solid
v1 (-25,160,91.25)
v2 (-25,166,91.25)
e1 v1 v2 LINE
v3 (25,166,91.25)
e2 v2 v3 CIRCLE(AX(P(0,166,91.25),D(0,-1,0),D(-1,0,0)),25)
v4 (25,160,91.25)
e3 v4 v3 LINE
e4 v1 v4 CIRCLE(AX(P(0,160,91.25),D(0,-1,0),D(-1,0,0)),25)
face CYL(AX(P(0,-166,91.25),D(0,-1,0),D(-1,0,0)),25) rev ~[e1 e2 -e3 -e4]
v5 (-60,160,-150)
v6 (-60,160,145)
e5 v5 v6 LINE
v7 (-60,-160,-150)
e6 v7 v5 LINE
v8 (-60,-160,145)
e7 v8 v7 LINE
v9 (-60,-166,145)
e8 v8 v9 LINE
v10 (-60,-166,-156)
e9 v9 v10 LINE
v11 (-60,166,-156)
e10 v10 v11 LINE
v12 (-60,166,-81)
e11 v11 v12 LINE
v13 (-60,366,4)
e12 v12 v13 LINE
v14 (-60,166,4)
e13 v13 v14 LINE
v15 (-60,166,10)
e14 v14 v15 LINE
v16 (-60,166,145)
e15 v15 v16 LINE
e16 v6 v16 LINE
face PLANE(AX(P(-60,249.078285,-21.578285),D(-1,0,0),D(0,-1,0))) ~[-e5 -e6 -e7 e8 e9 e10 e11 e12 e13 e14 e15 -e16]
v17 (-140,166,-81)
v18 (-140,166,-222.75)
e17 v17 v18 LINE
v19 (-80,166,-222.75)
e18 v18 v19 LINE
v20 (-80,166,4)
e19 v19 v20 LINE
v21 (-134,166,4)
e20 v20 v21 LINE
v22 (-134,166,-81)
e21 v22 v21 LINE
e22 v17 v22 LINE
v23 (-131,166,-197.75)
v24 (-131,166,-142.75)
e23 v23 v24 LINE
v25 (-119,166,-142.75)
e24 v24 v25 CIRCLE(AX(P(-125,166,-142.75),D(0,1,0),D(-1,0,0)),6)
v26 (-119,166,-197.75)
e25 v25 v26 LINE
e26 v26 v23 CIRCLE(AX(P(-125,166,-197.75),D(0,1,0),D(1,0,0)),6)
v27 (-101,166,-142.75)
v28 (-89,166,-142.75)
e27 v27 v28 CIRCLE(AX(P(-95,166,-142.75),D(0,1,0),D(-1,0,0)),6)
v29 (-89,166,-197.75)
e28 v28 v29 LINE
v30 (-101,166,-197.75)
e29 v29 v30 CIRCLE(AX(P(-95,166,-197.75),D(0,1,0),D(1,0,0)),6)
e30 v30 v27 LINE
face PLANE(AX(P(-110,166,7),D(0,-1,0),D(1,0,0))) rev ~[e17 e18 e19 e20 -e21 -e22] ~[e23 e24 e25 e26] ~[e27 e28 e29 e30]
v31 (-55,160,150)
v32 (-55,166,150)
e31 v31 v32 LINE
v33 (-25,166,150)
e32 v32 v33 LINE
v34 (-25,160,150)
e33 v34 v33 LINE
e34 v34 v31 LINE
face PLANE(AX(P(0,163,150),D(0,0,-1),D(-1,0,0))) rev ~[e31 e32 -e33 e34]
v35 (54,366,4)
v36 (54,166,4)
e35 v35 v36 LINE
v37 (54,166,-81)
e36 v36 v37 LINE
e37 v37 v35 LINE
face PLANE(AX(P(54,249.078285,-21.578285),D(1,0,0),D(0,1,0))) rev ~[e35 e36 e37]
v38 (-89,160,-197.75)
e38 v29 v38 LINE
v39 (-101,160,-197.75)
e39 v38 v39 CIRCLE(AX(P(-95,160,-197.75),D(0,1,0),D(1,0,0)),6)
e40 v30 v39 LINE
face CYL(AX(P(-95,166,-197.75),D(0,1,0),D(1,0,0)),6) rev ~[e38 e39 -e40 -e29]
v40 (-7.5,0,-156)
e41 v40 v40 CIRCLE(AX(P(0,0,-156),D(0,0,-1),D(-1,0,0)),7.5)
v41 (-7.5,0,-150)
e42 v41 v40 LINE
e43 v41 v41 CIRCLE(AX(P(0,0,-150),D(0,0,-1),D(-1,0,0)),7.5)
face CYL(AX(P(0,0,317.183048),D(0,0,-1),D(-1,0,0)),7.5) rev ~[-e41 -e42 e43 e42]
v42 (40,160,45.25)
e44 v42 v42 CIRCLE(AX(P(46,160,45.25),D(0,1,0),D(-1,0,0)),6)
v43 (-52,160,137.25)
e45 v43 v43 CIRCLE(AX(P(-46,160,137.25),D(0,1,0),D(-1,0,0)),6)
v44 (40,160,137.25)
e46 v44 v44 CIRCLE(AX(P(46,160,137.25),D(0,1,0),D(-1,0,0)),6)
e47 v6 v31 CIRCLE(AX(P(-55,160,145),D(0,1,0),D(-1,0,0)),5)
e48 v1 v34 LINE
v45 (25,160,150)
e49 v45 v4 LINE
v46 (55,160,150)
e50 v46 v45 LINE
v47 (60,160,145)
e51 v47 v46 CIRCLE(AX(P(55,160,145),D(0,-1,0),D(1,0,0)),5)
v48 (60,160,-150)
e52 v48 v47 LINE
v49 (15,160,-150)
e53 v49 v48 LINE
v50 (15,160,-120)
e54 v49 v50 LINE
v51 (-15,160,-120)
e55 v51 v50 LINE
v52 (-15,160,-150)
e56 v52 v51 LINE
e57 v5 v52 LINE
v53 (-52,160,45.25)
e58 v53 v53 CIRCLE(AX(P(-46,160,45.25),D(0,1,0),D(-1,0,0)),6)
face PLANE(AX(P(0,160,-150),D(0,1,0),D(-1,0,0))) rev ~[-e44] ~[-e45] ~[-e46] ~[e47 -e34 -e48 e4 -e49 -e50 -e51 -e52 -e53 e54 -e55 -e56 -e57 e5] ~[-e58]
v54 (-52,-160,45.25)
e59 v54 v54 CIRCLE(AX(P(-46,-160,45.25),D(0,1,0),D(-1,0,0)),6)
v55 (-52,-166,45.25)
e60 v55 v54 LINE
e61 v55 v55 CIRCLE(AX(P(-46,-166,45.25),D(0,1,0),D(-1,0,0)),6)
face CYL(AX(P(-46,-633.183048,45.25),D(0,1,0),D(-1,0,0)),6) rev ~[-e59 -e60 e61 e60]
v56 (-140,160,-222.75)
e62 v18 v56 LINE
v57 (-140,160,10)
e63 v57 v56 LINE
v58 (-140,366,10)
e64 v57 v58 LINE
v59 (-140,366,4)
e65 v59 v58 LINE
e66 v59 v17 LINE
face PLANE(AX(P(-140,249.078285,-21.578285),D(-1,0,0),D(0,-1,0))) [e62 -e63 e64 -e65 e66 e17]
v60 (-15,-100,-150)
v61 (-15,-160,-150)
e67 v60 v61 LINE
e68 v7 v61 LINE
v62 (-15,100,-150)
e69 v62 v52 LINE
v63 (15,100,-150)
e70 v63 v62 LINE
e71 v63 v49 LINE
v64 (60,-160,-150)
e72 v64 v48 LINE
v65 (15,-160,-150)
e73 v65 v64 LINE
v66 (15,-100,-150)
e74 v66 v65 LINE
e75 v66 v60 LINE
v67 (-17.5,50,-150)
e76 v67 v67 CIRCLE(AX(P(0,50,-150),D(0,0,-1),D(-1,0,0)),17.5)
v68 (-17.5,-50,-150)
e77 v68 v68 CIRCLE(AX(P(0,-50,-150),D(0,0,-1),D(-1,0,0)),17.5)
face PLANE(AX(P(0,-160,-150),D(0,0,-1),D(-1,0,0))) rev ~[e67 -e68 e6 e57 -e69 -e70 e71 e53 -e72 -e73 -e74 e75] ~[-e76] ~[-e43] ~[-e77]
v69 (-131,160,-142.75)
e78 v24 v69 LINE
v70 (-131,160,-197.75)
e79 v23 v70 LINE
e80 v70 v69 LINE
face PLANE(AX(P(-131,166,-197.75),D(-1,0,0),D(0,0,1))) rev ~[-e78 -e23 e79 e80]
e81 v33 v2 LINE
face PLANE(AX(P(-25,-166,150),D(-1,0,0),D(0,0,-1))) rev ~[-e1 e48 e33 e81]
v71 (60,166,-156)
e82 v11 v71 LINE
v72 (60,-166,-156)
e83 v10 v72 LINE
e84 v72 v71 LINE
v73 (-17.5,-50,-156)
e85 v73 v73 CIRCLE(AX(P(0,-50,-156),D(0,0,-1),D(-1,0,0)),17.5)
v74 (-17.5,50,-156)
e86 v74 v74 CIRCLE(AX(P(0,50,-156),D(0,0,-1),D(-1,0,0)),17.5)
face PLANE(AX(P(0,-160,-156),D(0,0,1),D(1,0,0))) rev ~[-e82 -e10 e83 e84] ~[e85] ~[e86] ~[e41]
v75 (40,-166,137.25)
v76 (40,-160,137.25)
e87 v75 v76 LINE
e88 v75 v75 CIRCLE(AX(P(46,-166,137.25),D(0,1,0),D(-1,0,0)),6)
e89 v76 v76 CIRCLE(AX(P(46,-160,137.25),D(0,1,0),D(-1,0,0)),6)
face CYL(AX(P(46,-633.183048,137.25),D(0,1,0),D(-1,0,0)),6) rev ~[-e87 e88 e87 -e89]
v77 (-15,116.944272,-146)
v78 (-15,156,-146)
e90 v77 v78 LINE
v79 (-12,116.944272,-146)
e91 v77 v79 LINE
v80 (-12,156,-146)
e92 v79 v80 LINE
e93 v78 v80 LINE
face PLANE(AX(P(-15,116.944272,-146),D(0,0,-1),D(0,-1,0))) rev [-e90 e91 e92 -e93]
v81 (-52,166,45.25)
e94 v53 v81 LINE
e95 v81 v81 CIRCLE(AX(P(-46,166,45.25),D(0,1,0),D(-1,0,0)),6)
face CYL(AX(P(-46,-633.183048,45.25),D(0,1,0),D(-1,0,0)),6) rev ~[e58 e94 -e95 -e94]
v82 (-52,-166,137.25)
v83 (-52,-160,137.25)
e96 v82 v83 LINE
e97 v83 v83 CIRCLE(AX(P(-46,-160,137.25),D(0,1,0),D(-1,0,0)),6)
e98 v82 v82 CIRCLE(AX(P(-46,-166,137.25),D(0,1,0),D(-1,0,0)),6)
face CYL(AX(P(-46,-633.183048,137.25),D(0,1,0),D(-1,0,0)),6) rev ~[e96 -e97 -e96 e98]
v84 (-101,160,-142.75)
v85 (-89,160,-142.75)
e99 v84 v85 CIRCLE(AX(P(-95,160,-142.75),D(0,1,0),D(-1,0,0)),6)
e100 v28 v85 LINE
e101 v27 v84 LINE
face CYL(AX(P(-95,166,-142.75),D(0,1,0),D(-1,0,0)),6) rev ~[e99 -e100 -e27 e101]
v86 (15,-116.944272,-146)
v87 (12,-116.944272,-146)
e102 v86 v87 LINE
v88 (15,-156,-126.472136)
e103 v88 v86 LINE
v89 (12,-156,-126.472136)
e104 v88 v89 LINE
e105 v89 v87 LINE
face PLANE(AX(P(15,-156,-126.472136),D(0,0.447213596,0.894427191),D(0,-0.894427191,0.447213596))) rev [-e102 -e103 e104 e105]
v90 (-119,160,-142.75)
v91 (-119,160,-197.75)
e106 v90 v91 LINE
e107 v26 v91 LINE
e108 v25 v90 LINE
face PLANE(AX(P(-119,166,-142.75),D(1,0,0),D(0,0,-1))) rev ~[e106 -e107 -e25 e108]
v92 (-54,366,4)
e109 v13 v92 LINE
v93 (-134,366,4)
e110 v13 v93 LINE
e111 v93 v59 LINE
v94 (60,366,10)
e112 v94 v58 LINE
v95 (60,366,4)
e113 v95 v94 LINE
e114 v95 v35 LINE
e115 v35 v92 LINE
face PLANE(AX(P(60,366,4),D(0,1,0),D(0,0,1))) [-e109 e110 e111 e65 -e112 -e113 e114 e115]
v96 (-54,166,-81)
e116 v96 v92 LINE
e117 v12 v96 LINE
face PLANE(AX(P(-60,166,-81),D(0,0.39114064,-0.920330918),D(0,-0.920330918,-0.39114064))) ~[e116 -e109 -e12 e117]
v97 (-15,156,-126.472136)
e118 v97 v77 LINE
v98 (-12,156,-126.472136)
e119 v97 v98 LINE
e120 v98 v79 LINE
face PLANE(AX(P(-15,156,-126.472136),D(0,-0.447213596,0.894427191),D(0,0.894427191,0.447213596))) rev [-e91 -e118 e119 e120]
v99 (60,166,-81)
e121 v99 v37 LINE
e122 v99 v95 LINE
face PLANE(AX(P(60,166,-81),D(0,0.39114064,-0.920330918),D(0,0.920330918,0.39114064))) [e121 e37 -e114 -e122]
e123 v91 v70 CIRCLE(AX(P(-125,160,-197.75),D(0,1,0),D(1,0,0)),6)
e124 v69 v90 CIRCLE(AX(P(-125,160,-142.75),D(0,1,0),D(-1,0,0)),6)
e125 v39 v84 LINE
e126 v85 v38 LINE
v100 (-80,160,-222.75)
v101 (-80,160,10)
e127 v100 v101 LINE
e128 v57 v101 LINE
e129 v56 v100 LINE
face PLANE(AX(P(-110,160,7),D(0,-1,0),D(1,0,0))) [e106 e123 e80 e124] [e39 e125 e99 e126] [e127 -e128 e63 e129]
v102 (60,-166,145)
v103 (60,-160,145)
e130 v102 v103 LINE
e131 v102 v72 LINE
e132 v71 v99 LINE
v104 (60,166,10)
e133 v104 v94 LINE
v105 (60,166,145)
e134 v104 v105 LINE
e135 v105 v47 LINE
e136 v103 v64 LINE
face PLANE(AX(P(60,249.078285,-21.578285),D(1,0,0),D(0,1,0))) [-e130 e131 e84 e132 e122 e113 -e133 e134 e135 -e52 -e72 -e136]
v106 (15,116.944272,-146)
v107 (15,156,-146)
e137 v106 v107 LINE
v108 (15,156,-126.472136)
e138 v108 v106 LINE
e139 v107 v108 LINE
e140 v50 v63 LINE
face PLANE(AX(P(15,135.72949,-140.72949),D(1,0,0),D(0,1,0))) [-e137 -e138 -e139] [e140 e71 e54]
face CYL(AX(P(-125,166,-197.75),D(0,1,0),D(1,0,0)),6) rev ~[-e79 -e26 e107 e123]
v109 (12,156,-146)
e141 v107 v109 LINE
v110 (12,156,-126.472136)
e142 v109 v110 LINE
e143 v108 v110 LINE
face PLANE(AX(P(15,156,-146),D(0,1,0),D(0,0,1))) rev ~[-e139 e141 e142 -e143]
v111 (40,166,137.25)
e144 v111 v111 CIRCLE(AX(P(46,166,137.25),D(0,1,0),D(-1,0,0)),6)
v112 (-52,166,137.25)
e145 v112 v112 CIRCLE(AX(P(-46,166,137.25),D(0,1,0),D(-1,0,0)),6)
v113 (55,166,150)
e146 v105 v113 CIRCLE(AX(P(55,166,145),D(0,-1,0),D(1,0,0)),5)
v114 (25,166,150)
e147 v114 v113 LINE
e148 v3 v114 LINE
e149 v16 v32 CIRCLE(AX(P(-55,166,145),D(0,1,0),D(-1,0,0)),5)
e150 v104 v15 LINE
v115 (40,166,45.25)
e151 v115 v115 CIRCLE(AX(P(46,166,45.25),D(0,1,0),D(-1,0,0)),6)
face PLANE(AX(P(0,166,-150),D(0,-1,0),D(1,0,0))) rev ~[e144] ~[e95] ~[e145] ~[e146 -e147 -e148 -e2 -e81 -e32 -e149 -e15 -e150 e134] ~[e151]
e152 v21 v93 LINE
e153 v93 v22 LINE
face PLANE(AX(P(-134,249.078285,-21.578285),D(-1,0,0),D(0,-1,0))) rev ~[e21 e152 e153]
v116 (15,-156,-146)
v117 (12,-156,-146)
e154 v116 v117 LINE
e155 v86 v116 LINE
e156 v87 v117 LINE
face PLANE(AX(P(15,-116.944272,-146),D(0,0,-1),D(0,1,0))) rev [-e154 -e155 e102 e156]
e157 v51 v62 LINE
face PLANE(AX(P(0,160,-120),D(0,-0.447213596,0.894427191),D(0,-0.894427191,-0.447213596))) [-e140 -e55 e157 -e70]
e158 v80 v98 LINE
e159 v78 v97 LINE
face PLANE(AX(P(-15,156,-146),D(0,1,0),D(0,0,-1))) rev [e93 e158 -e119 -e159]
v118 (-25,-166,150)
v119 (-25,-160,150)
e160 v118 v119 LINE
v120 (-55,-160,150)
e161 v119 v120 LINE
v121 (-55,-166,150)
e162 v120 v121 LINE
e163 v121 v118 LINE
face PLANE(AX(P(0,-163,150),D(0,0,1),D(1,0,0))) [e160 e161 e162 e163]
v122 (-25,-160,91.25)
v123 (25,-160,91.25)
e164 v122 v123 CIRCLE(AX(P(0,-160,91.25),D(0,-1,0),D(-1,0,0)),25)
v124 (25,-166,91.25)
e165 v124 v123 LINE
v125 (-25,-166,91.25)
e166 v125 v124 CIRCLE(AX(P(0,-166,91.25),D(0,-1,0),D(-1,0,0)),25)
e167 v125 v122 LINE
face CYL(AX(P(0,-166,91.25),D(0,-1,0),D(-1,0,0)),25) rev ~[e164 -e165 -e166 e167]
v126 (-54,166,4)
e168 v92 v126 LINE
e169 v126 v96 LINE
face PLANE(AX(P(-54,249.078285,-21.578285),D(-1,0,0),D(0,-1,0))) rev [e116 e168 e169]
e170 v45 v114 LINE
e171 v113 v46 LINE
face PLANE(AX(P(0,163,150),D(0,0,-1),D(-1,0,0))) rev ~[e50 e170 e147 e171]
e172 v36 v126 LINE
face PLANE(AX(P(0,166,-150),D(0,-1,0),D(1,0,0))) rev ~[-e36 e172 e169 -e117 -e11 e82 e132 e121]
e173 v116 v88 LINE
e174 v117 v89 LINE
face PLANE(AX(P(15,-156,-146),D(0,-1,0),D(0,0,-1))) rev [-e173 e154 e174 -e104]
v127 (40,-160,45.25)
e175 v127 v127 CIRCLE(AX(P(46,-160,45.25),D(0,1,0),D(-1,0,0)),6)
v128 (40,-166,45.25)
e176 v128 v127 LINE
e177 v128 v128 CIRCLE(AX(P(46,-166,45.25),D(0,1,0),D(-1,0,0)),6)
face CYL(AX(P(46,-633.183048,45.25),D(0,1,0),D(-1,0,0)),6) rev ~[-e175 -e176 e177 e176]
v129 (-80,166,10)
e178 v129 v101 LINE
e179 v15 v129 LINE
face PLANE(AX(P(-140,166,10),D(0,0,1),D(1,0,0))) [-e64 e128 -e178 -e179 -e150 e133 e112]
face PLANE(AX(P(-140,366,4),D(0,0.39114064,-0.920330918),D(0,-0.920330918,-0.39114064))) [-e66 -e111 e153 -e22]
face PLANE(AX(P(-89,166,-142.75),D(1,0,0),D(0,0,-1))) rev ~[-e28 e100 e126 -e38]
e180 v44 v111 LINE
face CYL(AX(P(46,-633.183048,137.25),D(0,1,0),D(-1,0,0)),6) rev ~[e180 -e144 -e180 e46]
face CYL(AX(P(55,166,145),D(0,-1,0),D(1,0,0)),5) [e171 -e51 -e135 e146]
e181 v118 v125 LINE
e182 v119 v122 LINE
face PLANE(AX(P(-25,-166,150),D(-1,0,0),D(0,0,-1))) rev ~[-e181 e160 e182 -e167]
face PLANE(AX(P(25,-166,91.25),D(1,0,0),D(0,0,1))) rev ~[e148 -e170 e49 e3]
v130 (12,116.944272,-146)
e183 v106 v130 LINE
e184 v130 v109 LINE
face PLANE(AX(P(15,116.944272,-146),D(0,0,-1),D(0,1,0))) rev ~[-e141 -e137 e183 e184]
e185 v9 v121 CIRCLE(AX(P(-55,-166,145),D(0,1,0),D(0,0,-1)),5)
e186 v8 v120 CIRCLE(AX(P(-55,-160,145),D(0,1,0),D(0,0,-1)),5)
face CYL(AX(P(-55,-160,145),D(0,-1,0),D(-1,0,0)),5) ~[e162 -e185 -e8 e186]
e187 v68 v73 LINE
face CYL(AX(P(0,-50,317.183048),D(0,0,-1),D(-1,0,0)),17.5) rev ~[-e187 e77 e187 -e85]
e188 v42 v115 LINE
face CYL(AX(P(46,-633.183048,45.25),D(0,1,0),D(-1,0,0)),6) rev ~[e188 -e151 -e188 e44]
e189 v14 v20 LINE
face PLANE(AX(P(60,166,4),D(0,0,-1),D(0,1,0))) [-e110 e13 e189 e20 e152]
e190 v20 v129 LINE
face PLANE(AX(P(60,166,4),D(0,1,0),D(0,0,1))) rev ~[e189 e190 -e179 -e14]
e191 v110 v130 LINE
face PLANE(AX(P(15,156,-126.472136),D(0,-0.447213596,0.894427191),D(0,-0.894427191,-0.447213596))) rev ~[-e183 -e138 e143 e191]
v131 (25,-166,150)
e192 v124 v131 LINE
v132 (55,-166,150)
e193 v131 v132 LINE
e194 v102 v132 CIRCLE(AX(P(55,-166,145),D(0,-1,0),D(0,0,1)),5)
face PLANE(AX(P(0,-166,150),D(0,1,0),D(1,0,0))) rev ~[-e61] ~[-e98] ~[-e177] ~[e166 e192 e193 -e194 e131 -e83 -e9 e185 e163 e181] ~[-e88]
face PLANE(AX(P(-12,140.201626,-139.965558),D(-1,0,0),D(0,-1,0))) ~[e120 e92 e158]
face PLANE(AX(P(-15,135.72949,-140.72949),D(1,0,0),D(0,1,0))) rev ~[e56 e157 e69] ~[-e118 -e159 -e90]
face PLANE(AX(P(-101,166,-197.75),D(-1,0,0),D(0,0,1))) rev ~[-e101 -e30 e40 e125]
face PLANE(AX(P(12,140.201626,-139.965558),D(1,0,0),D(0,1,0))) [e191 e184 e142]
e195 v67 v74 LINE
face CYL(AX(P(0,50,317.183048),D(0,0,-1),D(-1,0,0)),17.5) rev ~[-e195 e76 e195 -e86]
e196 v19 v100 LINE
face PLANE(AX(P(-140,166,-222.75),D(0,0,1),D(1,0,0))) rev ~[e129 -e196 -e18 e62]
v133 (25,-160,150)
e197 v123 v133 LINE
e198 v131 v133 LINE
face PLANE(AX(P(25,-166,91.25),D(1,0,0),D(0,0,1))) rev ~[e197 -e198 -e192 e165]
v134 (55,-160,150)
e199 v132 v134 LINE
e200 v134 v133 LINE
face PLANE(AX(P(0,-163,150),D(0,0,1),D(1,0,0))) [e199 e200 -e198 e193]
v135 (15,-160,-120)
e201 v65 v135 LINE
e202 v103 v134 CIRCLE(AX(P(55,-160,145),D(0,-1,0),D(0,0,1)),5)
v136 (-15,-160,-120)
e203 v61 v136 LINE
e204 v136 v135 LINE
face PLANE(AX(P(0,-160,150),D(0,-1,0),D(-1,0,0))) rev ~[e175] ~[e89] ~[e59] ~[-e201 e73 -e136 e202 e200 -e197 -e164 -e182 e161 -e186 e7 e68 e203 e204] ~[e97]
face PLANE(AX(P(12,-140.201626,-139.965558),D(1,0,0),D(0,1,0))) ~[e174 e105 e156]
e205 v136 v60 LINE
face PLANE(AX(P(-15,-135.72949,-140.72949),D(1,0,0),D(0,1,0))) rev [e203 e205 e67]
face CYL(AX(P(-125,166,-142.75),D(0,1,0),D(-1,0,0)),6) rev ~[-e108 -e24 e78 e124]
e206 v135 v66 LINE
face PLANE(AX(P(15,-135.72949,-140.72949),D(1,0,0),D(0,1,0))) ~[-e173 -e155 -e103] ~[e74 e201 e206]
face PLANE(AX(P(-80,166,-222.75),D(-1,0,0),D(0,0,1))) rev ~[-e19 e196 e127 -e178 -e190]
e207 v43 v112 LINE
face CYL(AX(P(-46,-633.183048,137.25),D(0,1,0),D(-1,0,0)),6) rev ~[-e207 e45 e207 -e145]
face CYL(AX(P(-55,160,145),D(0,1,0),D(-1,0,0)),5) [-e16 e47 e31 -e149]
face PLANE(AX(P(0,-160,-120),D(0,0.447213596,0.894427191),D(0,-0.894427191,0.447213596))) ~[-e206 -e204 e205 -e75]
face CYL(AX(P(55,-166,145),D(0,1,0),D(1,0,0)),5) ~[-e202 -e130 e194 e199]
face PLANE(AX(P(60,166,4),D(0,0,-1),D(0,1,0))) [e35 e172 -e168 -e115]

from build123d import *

# Parameters (mm, degrees)
F2_W      = 120
F2_H      = 6
F5_D      = 12
F7_DEPTH  = 332
F9_DEPTH  = 15
F11_DEPTH = 3
F12_R     = 5
F14_D     = 35
F15_D     = 15
F16_W     = 200
F16_H     = 6
F17_DEPTH = 200
F18_DEPTH = 6
F19_W     = 60
F19_H     = 6
F19_H_2   = 226.75
F20_DEPTH = 6
F22_DEPTH = 6


# Not quite as in the source:
# - a pattern or mirror of a feature is missing from the dataset's text; its kind, count and spacing are read off the source's solid


with BuildPart() as f3:
    # F3: sweep along a path in F0
    with BuildLine(Plane.YZ) as f3_path:
        Line((-160, 150), (-160, -150))
        Line((-160, -150), (160, -150))
        Line((160, -150), (160, 150))
    # F2 (on offset) → F3 (sweep)
    with BuildSketch(Plane.XY.offset(150)):
        with Locations((0, -163)):
            Rectangle(F2_W, F2_H)
    sweep(path=f3_path.line, transition=Transition.RIGHT)

    # F5 (through all)
    with Locations(Plane.XZ.offset(166)):
        with Locations((-46, 137.25), (-46, 45.25), (46, 45.25), (46, 137.25)):
            Hole(F5_D / 2)

    # F6 (on face) → F7 (cut, through all)
    with BuildSketch(Plane.XZ.offset(166)):
        with BuildLine():
            Line((25, 150), (-25, 150))
            Line((-25, 150), (-25, 91.25))
            ThreePointArc((-25, 91.25), (0, 66.25), (25, 91.25))
            Line((25, 91.25), (25, 150))
        make_face()
    extrude(amount=-F7_DEPTH, mode=Mode.SUBTRACT)

    # F8 (on Right) → F9 (join, symmetric)
    with BuildSketch(Plane.YZ):
        Polygon((160, -150), (160, -120), (100, -150), align=None)
    f9 = extrude(amount=F9_DEPTH, both=True)

    # F9_copies: F9 across plane
    add(f9.mirror(Plane(origin=(0, 0, 0), x_dir=(0, 0, -1), z_dir=(0, -1, 0))))

    # F10 (on face) → F11 (cut)
    with BuildSketch(Plane.YZ.offset(15)):
        Polygon((116.94427191, -146), (156, -146), (156, -126.472135955), align=None)
    f11 = extrude(amount=-F11_DEPTH, mode=Mode.SUBTRACT)

    # F11_copies: F11 across plane
    add(f11.mirror(Plane(origin=(0, 0, 0), x_dir=(0, 0, -1), z_dir=(-1, 0, 0))), mode=Mode.SUBTRACT)

    # F11_copies1: F11 across plane
    add(f11.mirror(Plane(origin=(0, 0, 0), x_dir=(0, 0, -1), z_dir=(0, -1, 0))), mode=Mode.SUBTRACT)

    # F12
    f12_edges = [f3.edges().sort_by_distance(p)[0] for p in [
        (60, -163, 150),
        (-60, -163, 150),
        (-60, 163, 150),
        (60, 163, 150),
    ]]
    fillet(f12_edges, radius=F12_R)

    # F14 (through all)
    with Locations(Plane.XY.offset(-150)):
        with Locations((0, 50), (0, -50)):
            Hole(F14_D / 2)

    # F15 (through all)
    with Locations(Plane.XY.offset(-150)):
        with Locations((0, 0)):
            Hole(F15_D / 2)

    # F16 (on face) → F17 (join)
    with BuildSketch(Plane.YZ.offset(60)):
        with Locations((266, 7)):
            Rectangle(F16_W, F16_H)
    extrude(amount=-F17_DEPTH)

    # F16 (on face) → F18 (join)
    with BuildSketch(Plane.YZ.offset(60)):
        Polygon((366, 4), (166, 4), (166, -81), align=None)
    f18 = extrude(amount=-F18_DEPTH)

    # F18_copies: F18 across plane
    add(f18.mirror(Plane(origin=(0, 0, 0), x_dir=(0, 0, -1), z_dir=(-1, 0, 0))))

    # F19 (on face) → F20 (join)
    with BuildSketch(Plane.XZ.offset(-166)):
        with Locations((-110, 7)):
            Rectangle(F19_W, F19_H)
        with Locations((-110, -109.375)):
            Rectangle(F19_W, F19_H_2)
        with BuildLine():
            ThreePointArc((-131, -142.75), (-125, -136.75), (-119, -142.75))
            Line((-119, -142.75), (-119, -197.75))
            ThreePointArc((-119, -197.75), (-125, -203.75), (-131, -197.75))
            Line((-131, -197.75), (-131, -142.75))
        make_face(mode=Mode.SUBTRACT)
        with BuildLine():
            Line((-101, -197.75), (-101, -142.75))
            ThreePointArc((-101, -142.75), (-95, -136.75), (-89, -142.75))
            Line((-89, -142.75), (-89, -197.75))
            ThreePointArc((-89, -197.75), (-95, -203.75), (-101, -197.75))
        make_face(mode=Mode.SUBTRACT)
    extrude(amount=F20_DEPTH)

    # F21 (on face) → F22 (join)
    with BuildSketch(Plane(origin=(-140, 0, 0), x_dir=(0, -1, 0), z_dir=(-1, 0, 0))):
        Polygon((-166, -81), (-166, 4), (-366, 4), align=None)
    extrude(amount=-F22_DEPTH)


solid = f3.part
